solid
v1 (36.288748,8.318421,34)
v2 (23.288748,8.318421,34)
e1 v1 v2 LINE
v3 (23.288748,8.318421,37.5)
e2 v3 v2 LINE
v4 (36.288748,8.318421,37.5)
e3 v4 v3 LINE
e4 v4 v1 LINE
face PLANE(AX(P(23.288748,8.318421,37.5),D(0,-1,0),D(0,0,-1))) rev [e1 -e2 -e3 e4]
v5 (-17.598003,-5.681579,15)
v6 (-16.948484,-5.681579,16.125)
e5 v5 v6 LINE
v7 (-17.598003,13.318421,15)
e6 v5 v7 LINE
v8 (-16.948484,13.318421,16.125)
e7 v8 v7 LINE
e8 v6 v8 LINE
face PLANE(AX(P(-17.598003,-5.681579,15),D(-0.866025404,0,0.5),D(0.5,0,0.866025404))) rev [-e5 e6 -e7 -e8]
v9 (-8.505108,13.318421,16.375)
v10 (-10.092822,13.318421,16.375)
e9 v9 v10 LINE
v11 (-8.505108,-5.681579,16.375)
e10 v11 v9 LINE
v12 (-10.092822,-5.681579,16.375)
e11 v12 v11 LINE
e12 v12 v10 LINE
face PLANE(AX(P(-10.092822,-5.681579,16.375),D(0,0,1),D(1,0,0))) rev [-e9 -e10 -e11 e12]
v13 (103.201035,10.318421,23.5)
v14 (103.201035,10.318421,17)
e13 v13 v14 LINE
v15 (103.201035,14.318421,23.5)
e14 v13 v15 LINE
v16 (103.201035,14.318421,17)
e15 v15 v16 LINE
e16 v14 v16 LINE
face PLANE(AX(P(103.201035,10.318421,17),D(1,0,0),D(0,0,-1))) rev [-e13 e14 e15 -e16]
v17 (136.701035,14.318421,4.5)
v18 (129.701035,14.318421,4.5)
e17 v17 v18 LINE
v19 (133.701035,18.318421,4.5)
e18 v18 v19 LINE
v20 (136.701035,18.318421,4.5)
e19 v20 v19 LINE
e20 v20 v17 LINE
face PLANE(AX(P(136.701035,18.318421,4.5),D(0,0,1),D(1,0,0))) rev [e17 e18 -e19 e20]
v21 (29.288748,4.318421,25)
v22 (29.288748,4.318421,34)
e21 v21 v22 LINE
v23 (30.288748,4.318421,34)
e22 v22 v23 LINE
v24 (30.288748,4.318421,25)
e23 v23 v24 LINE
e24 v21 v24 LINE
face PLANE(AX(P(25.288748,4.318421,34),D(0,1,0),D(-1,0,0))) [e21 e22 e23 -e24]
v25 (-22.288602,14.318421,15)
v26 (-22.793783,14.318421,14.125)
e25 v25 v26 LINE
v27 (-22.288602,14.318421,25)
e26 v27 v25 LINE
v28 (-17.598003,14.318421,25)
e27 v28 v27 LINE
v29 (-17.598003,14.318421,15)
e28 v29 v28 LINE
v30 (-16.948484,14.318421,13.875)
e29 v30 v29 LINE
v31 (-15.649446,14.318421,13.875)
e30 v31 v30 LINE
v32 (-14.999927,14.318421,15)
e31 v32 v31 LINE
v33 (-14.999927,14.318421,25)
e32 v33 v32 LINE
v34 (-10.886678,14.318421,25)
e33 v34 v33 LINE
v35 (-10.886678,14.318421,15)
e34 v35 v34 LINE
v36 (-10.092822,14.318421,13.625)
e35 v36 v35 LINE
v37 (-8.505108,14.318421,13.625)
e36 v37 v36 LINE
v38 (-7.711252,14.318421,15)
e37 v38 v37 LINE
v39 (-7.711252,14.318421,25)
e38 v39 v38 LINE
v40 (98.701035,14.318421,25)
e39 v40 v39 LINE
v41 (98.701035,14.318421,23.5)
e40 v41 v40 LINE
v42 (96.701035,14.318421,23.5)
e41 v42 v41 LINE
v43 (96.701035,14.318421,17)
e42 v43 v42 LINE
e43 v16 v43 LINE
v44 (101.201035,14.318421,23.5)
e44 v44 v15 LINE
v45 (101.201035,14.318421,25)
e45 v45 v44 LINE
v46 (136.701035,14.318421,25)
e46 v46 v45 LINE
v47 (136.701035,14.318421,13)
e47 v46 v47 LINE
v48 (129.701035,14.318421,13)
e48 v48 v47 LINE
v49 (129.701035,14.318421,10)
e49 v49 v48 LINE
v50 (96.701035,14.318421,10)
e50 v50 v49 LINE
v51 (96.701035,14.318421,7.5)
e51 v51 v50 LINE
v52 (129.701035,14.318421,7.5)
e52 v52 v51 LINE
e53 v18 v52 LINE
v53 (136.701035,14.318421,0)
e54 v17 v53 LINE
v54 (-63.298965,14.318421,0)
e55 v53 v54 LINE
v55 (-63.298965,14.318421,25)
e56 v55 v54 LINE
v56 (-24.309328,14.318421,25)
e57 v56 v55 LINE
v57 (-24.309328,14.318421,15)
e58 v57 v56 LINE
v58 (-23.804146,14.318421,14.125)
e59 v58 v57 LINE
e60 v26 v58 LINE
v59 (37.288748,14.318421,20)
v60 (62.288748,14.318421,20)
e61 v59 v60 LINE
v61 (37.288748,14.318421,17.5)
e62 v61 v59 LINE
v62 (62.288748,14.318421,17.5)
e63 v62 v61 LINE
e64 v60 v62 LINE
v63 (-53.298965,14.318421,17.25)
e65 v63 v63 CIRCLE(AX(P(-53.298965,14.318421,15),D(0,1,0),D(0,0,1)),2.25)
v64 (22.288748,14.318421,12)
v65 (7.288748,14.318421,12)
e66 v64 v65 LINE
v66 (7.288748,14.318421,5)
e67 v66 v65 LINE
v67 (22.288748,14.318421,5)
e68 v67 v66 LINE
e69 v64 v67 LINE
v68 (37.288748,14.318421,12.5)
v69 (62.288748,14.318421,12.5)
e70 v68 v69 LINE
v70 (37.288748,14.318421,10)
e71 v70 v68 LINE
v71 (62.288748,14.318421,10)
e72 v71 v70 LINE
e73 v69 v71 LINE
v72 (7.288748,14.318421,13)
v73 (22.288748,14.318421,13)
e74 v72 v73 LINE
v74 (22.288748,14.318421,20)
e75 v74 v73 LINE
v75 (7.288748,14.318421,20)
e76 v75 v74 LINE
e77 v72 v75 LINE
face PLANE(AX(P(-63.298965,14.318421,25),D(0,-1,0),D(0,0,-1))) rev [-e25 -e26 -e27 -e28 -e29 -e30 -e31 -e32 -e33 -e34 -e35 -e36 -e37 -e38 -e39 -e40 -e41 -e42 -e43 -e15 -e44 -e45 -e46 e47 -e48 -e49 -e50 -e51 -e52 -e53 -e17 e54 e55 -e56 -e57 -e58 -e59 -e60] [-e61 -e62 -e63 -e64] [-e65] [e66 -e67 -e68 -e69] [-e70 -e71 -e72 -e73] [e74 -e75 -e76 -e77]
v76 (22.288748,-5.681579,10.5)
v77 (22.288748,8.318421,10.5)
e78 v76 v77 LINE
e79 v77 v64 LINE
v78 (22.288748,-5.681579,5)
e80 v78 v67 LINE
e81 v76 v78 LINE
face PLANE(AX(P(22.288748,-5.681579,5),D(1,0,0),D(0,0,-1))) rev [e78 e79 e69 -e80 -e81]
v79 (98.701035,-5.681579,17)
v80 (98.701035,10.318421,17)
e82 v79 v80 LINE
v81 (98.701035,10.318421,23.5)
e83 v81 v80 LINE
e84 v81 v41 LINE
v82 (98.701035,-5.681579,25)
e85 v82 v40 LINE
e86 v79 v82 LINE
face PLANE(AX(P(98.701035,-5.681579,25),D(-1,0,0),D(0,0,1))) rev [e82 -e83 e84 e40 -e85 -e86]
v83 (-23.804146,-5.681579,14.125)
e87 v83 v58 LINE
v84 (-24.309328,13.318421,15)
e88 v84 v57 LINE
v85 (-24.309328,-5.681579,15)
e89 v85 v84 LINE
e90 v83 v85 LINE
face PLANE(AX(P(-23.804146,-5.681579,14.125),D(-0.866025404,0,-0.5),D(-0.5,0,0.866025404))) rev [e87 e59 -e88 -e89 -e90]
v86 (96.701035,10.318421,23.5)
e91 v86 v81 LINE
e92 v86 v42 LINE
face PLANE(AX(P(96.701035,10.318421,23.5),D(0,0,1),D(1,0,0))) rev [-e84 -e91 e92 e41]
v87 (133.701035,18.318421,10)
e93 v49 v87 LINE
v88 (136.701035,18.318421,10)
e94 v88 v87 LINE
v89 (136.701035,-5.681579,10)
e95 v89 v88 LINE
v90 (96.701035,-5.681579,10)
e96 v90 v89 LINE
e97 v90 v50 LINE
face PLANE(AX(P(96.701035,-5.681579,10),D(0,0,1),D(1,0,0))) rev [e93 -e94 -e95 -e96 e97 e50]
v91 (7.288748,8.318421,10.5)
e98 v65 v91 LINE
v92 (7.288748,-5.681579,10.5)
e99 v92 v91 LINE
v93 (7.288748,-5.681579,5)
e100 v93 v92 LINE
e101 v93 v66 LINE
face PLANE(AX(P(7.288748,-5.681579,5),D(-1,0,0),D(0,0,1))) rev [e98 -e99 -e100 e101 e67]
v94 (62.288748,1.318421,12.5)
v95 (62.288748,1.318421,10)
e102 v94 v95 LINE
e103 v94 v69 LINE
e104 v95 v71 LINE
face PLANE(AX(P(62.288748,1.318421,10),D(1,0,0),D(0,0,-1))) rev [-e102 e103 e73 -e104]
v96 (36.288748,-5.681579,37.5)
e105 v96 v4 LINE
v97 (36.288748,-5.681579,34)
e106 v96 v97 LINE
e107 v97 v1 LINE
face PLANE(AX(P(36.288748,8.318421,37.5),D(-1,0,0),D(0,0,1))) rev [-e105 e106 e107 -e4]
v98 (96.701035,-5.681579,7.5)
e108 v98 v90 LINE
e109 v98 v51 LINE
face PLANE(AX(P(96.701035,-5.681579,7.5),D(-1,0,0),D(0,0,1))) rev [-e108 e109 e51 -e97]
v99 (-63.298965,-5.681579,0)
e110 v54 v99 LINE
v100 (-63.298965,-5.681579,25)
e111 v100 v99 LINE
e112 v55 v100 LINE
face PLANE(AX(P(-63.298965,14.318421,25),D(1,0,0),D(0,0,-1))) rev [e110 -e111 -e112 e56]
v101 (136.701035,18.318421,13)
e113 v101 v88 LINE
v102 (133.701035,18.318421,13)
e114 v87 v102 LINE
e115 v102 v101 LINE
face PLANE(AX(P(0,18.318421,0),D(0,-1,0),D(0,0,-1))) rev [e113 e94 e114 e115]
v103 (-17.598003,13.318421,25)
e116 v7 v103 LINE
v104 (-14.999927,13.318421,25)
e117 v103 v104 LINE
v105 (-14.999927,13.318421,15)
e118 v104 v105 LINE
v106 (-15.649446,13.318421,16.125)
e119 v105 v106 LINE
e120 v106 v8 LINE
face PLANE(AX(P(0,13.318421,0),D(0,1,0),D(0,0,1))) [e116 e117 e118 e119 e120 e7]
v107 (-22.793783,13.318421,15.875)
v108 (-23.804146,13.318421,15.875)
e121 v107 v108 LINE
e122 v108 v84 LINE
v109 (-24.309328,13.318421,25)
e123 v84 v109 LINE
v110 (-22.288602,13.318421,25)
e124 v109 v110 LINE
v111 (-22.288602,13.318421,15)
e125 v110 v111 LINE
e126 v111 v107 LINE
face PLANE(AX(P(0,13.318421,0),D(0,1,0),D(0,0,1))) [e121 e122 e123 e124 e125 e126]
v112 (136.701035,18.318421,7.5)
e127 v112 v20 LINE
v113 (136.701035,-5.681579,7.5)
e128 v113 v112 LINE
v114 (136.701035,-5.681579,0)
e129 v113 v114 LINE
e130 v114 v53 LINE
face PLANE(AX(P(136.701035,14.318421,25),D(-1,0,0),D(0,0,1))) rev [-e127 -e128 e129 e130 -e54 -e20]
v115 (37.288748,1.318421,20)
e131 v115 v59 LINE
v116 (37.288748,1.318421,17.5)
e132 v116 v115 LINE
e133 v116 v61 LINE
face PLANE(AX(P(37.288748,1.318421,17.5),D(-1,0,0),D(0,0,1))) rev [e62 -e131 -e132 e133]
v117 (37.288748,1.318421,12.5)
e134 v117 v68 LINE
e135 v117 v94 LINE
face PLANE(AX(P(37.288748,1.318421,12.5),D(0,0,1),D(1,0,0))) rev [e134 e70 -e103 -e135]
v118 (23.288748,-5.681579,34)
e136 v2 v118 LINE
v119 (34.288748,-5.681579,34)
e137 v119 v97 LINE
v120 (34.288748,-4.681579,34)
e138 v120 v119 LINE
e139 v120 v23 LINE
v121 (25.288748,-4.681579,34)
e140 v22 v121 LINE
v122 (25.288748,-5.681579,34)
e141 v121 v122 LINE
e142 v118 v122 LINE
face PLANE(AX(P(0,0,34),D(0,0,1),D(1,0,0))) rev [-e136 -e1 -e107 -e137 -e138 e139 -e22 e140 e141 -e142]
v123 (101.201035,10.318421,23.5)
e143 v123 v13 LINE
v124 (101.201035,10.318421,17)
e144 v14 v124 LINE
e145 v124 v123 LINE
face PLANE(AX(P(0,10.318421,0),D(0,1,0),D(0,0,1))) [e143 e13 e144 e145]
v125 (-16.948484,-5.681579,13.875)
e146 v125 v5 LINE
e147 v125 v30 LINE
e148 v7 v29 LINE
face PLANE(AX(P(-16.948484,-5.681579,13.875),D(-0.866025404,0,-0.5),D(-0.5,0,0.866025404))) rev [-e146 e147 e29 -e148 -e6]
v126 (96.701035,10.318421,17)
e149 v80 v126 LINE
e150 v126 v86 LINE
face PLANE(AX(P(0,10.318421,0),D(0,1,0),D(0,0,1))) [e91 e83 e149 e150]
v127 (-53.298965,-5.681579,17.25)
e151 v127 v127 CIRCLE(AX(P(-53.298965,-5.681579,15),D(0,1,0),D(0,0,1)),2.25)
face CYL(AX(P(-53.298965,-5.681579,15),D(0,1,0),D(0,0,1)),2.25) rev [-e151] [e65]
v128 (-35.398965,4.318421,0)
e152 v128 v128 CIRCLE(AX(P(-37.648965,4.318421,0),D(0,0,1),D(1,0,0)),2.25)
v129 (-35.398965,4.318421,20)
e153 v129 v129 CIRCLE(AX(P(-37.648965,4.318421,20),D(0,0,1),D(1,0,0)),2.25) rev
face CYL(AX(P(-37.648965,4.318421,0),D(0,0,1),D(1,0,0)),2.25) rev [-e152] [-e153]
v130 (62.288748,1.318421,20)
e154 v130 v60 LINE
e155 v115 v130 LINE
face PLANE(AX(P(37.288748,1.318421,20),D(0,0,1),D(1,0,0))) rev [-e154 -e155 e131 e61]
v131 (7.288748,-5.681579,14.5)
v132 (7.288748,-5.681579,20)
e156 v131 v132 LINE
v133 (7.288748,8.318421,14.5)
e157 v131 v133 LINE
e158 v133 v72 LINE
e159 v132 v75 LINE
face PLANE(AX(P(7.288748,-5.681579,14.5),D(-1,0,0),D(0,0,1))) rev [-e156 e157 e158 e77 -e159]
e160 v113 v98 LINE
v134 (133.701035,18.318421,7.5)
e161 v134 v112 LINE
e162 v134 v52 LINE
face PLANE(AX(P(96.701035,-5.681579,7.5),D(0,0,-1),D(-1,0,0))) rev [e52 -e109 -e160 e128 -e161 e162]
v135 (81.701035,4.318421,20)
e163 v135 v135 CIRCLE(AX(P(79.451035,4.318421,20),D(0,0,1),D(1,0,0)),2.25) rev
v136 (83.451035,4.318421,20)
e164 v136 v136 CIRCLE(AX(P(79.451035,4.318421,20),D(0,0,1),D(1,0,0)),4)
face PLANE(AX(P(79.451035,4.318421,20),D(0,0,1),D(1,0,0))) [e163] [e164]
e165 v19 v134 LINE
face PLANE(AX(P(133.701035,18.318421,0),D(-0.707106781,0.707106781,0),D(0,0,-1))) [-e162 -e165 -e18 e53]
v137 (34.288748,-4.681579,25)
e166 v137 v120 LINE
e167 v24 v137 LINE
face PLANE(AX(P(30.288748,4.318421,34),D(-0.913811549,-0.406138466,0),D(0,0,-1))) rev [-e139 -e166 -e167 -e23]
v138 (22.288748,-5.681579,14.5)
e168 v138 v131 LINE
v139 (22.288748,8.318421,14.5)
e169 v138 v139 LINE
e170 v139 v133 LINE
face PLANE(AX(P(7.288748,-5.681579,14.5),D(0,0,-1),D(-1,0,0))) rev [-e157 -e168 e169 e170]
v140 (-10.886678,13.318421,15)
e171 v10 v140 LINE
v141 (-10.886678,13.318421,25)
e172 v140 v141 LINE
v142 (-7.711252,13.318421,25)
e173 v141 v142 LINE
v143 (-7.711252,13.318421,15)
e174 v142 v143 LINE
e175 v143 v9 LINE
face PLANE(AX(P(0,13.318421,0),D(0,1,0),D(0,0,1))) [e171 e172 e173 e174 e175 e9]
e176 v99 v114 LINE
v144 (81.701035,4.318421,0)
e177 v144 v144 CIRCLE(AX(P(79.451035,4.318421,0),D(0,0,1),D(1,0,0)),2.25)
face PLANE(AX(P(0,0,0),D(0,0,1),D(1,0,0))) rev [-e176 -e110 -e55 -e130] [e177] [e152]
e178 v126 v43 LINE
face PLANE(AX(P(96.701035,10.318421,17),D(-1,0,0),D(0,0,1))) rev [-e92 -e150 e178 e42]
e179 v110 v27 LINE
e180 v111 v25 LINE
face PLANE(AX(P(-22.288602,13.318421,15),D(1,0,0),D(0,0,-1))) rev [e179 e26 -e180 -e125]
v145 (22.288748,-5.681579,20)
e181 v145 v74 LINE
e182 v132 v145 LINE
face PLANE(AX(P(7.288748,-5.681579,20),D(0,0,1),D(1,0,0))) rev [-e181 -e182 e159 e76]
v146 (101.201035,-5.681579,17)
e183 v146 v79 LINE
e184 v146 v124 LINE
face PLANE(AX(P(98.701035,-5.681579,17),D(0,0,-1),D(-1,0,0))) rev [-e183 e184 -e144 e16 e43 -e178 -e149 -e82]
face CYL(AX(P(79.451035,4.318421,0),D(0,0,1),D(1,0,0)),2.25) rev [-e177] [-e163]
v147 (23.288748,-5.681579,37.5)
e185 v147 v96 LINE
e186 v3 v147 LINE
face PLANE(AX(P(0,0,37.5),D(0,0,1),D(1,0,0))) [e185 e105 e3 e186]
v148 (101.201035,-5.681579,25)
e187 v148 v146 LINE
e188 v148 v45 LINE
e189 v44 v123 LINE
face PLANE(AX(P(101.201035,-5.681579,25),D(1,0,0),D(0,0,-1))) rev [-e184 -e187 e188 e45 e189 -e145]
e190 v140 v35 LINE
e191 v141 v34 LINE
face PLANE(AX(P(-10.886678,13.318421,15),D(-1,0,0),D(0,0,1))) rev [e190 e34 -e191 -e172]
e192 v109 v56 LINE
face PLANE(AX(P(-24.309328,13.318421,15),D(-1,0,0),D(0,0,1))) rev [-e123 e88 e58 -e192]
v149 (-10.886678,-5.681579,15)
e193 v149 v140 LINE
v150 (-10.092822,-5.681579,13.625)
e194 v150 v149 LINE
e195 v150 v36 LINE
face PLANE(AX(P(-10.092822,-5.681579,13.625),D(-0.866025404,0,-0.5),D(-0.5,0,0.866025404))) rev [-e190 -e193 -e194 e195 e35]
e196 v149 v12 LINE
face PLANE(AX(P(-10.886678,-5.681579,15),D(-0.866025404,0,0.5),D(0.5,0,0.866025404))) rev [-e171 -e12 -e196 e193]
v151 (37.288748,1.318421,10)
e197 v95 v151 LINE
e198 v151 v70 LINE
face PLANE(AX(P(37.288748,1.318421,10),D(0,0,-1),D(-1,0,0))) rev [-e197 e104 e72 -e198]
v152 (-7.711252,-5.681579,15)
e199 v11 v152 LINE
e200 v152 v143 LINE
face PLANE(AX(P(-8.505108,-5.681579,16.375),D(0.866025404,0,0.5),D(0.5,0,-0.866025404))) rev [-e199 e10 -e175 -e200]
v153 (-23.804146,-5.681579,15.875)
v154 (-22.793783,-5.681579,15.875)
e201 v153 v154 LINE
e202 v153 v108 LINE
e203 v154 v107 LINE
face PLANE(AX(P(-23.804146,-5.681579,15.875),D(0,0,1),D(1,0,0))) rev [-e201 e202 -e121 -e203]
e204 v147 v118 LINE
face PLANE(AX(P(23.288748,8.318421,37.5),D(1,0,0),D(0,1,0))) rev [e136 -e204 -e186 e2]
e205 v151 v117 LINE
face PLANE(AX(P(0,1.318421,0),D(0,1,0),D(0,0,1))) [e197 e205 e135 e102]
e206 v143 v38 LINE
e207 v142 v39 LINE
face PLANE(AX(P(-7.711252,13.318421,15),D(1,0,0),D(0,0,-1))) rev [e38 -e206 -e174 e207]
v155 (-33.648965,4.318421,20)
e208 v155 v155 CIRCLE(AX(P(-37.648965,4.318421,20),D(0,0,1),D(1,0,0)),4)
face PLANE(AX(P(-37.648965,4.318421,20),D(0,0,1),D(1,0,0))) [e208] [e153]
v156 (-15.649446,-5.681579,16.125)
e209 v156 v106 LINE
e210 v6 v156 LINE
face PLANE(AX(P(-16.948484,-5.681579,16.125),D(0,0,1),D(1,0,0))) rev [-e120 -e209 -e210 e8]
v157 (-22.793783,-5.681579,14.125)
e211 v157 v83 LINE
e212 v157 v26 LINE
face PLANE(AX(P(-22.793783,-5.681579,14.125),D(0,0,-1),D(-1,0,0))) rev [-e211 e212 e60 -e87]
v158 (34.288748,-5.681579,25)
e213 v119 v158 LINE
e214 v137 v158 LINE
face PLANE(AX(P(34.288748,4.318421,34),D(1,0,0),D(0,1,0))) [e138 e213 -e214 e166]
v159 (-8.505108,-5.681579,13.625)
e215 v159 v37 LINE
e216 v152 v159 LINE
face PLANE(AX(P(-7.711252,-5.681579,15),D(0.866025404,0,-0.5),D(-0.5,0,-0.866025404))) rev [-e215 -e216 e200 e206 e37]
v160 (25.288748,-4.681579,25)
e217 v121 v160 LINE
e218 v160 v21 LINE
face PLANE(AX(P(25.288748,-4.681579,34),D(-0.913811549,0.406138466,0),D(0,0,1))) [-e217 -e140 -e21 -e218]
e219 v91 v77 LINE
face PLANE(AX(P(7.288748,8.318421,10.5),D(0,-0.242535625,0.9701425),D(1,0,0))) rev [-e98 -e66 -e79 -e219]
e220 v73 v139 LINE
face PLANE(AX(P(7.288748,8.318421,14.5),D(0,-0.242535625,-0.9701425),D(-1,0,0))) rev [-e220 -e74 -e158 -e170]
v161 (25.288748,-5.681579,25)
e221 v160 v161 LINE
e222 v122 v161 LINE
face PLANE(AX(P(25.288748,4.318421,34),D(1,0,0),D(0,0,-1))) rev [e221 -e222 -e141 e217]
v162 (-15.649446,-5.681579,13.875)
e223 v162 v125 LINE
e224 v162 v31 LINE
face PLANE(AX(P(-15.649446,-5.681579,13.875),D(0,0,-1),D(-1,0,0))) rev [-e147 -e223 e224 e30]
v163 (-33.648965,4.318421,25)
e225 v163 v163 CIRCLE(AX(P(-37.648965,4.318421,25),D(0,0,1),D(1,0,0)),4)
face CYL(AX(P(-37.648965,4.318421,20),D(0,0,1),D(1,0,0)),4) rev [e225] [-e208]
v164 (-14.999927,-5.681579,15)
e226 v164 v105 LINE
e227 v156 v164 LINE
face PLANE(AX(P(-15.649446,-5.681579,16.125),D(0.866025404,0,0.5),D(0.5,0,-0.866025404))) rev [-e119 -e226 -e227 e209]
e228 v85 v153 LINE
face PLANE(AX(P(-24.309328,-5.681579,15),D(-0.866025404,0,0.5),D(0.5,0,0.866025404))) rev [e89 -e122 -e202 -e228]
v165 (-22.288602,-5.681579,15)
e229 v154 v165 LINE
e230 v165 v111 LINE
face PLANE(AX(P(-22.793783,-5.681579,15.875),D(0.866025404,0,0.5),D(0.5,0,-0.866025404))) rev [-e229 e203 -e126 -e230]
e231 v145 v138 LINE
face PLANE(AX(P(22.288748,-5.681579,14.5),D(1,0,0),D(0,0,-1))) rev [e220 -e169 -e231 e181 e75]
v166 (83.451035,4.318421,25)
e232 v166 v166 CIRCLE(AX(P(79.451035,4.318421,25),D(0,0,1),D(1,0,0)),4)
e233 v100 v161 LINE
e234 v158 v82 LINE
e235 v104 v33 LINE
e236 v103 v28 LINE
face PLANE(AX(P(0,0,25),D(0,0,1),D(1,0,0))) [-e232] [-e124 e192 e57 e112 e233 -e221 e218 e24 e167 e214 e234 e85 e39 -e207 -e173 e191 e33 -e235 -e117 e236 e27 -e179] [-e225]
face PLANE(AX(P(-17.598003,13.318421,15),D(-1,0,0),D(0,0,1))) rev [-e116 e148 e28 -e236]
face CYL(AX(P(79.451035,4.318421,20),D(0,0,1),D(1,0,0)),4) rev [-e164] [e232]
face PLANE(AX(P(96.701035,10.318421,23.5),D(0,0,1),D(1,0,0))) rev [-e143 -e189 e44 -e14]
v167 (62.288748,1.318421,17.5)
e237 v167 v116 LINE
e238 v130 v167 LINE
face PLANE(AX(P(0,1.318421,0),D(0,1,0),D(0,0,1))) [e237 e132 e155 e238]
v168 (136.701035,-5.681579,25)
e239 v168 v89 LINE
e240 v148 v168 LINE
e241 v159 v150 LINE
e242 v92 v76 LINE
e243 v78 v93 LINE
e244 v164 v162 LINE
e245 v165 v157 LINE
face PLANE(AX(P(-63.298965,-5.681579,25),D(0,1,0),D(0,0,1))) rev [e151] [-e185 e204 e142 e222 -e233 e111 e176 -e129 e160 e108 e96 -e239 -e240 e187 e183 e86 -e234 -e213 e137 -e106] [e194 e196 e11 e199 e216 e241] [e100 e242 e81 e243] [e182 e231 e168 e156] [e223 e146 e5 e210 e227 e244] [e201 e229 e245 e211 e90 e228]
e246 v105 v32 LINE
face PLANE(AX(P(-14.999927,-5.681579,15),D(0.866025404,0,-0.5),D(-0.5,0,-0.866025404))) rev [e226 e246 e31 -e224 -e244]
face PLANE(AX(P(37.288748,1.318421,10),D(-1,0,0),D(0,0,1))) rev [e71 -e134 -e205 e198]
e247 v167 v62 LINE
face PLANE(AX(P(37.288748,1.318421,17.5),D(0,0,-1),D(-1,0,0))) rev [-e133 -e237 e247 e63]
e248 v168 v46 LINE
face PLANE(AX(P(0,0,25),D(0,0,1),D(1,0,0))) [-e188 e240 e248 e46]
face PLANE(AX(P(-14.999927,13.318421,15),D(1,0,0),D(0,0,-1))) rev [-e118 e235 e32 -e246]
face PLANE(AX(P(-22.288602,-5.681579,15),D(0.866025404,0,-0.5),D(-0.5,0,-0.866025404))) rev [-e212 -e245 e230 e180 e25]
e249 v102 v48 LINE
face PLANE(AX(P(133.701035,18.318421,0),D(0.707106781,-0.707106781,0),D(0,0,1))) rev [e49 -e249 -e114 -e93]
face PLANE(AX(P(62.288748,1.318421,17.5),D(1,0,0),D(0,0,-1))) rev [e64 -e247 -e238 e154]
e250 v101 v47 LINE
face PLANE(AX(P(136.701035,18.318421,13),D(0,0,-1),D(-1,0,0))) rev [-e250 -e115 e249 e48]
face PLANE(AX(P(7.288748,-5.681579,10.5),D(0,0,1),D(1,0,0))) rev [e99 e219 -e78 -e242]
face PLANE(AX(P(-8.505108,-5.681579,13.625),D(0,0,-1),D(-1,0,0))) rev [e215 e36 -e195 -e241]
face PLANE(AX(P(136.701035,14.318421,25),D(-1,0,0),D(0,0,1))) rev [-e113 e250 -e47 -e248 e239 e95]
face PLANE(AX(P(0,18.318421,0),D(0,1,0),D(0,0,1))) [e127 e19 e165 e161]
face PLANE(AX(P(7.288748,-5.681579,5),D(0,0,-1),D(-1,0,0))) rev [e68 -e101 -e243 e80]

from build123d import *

# Parameters (mm, degrees)
SCHIZZO1_W                    = 200
SCHIZZO1_H                    = 20
ESTRUSIONE_ESTRUSIONE1_DEPTH  = 25
SCHIZZO2_R                    = 2.25
TAGLIO_ESTRUSIONE1_DEPTH      = 141.400046302
SCHIZZO4_W                    = 2.020725942
SCHIZZO4_H                    = 10
SCHIZZO4_W_2                  = 2.598076211
SCHIZZO4_W_3                  = 3.175426481
TAGLIO_ESTRUSIONE2_DEPTH      = 1
SCHIZZO7_W                    = 15
SCHIZZO7_H                    = 5.5
TAGLIO_ESTRUSIONE3_DEPTH      = 141.400046302
SMUSSO1_SIZE                  = 1.5
SMUSSO1_SIZE2                 = 6
SCHIZZO8_W                    = 25
SCHIZZO8_H                    = 2.5
TAGLIO_ESTRUSIONE4_DEPTH      = 13
SCHIZZO9_W                    = 40
SCHIZZO9_H                    = 2.5
TAGLIO_ESTRUSIONE5_DEPTH      = 141.400046302
SCHIZZO10_W                   = 7
SCHIZZO10_H                   = 3
ESTRUSIONE_ESTRUSIONE5_DEPTH  = 4
SMUSSO2_SIZE                  = 4
SCHIZZO11_W                   = 2.5
SCHIZZO11_H                   = 8
TAGLIO_ESTRUSIONE6_DEPTH      = 141.400046302
SCHIZZO12_W                   = 6.5
SCHIZZO12_H                   = 6.5
TAGLIO_ESTRUSIONE7_DEPTH      = 4
SCHIZZO13_W                   = 9
SCHIZZO13_H                   = 10
ESTRUSIONE_ESTRUSIONE9_DEPTH  = 9
SCHIZZO14_W                   = 13
SCHIZZO14_H                   = 14
ESTRUSIONE_ESTRUSIONE10_DEPTH = 3.5
SMUSSO3_SIZE                  = 9
SMUSSO3_SIZE2                 = 4
SMUSSO4_SIZE                  = 4
SMUSSO4_SIZE2                 = 9
SCHIZZO16_R                   = 2.25
TAGLIO_ESTRUSIONE8_DEPTH      = 141.17038757
SCHIZZO17_R                   = 4
TAGLIO_ESTRUSIONE9_DEPTH      = 5


with BuildPart() as part:
    # Schizzo1 → Estrusione-Estrusione1 (new body)
    with BuildSketch(Plane.XY):
        with Locations((36.701035116, 4.318421053)):
            Rectangle(SCHIZZO1_W, SCHIZZO1_H)
    extrude(amount=ESTRUSIONE_ESTRUSIONE1_DEPTH)

    # Schizzo2 → Taglio-Estrusione1 (cut, through all)
    with BuildSketch(Plane(origin=(0, 14.318421053, 0), x_dir=(1, 0, 0), z_dir=(0, 1, 0))):
        with Locations(Location((-53.298964884, -15, 0), (0, 0, 270))):
            Circle(SCHIZZO2_R)
        Polygon((-23.80414637, -15.875), (-22.793783399, -15.875), (-22.288601913, -15), (-22.793783399, -14.125), (-23.80414637, -14.125), (-24.309327855, -15), align=None)
        Polygon((-14.999926779, -15), (-15.649445831, -13.875), (-16.948483937, -13.875), (-17.59800299, -15), (-16.948483937, -16.125), (-15.649445831, -16.125), align=None)
        Polygon((-8.505108264, -16.375), (-7.711251644, -15), (-8.505108264, -13.625), (-10.092821504, -13.625), (-10.886678125, -15), (-10.092821504, -16.375), align=None)
    extrude(amount=-TAGLIO_ESTRUSIONE1_DEPTH, mode=Mode.SUBTRACT)

    # Schizzo4 → Taglio-Estrusione2 (cut)
    with BuildSketch(Plane(origin=(0, 14.318421053, 0), x_dir=(1, 0, 0), z_dir=(0, 1, 0))):
        with Locations((-23.298964884, -20)):
            Rectangle(SCHIZZO4_W, SCHIZZO4_H)
        with Locations((-16.298964885, -20)):
            Rectangle(SCHIZZO4_W_2, SCHIZZO4_H)
        with Locations((-9.298964885, -20)):
            Rectangle(SCHIZZO4_W_3, SCHIZZO4_H)
    extrude(amount=-TAGLIO_ESTRUSIONE2_DEPTH, mode=Mode.SUBTRACT)

    # Schizzo7 → Taglio-Estrusione3 (cut, through all)
    with BuildSketch(Plane(origin=(0, 14.318421053, 0), x_dir=(1, 0, 0), z_dir=(0, 1, 0))):
        with Locations((14.788748356, -17.25)):
            Rectangle(SCHIZZO7_W, SCHIZZO7_H)
        with Locations((14.788748356, -7.75)):
            Rectangle(SCHIZZO7_W, SCHIZZO7_H)
    extrude(amount=-TAGLIO_ESTRUSIONE3_DEPTH, mode=Mode.SUBTRACT)

    # Smusso1
    smusso1_edges = [part.edges().sort_by_distance(p)[0] for p in [
        (14.788748356, 14.318421053, 14.5),
        (14.788748356, 14.318421053, 10.5),
    ]]
    smusso1_side = [part.faces().sort_by_distance(p)[0] for p in [
        (38.695689024, 14.318421053, 12.36530447),
    ]]
    chamfer(smusso1_edges, length=SMUSSO1_SIZE, length2=SMUSSO1_SIZE2, reference=smusso1_side[0])

    # Schizzo8 → Taglio-Estrusione4 (cut)
    with BuildSketch(Plane(origin=(0, 14.318421053, 0), x_dir=(1, 0, 0), z_dir=(0, 1, 0))):
        with Locations((49.788748356, -18.75)):
            Rectangle(SCHIZZO8_W, SCHIZZO8_H)
        with Locations((49.788748356, -11.25)):
            Rectangle(SCHIZZO8_W, SCHIZZO8_H)
    extrude(amount=-TAGLIO_ESTRUSIONE4_DEPTH, mode=Mode.SUBTRACT)

    # Schizzo9 → Taglio-Estrusione5 (cut, through all)
    with BuildSketch(Plane(origin=(0, 14.318421053, 0), x_dir=(1, 0, 0), z_dir=(0, 1, 0))):
        with Locations((116.701035116, -8.75)):
            Rectangle(SCHIZZO9_W, SCHIZZO9_H)
    extrude(amount=-TAGLIO_ESTRUSIONE5_DEPTH, mode=Mode.SUBTRACT)

    # Schizzo10 → Estrusione-Estrusione5 (add)
    with BuildSketch(Plane(origin=(0, 14.318421053, 0), x_dir=(1, 0, 0), z_dir=(0, 1, 0))):
        with Locations((133.201035116, -6)):
            Rectangle(SCHIZZO10_W, SCHIZZO10_H)
        with Locations((133.201035116, -11.5)):
            Rectangle(SCHIZZO10_W, SCHIZZO10_H)
    extrude(amount=ESTRUSIONE_ESTRUSIONE5_DEPTH)

    # Smusso2
    smusso2_edges = [part.edges().sort_by_distance(p)[0] for p in [
        (129.701035116, 18.318421053, 11.5),
        (129.701035116, 18.318421053, 6),
    ]]
    chamfer(smusso2_edges, length=SMUSSO2_SIZE - 0.0001)  # a hair under: the kernel refuses the full size

    # Schizzo11 → Taglio-Estrusione6 (cut, through all)
    with BuildSketch(Plane(origin=(0, 14.318421053, 0), x_dir=(1, 0, 0), z_dir=(0, 1, 0))):
        with Locations((99.951035116, -21)):
            Rectangle(SCHIZZO11_W, SCHIZZO11_H)
    extrude(amount=-TAGLIO_ESTRUSIONE6_DEPTH, mode=Mode.SUBTRACT)

    # Schizzo12 → Taglio-Estrusione7 (cut)
    with BuildSketch(Plane(origin=(0, 14.318421053, 0), x_dir=(1, 0, 0), z_dir=(0, 1, 0))):
        with Locations((99.951035116, -20.25)):
            Rectangle(SCHIZZO12_W, SCHIZZO12_H)
    extrude(amount=-TAGLIO_ESTRUSIONE7_DEPTH, mode=Mode.SUBTRACT)

    # Schizzo13 → Estrusione-Estrusione9 (add)
    with BuildSketch(Plane.XY.offset(25)):
        with Locations((29.788748356, -0.681578947)):
            Rectangle(SCHIZZO13_W, SCHIZZO13_H)
    extrude(amount=ESTRUSIONE_ESTRUSIONE9_DEPTH)

    # Schizzo14 → Estrusione-Estrusione10 (add)
    with BuildSketch(Plane.XY.offset(34)):
        with Locations((29.788748356, 1.318421053)):
            Rectangle(SCHIZZO14_W, SCHIZZO14_H)
    extrude(amount=ESTRUSIONE_ESTRUSIONE10_DEPTH)

    # Smusso3
    smusso3_edges = [part.edges().sort_by_distance(p)[0] for p in [
        (34.288748356, 4.318421053, 29.5),
    ]]
    smusso3_side = [part.faces().sort_by_distance(p)[0] for p in [
        (34.288748356, -0.681578947, 29.5),
    ]]
    chamfer(smusso3_edges, length=SMUSSO3_SIZE, length2=SMUSSO3_SIZE2, reference=smusso3_side[0])

    # Smusso4
    smusso4_edges = [part.edges().sort_by_distance(p)[0] for p in [
        (25.288748356, 4.318421053, 29.5),
    ]]
    smusso4_side = [part.faces().sort_by_distance(p)[0] for p in [
        (27.788748356, 4.318421053, 29.5),
    ]]
    chamfer(smusso4_edges, length=SMUSSO4_SIZE, length2=SMUSSO4_SIZE2, reference=smusso4_side[0])

    # Schizzo16 → Taglio-Estrusione8 (cut, through all)
    with BuildSketch(Plane.XY.offset(25)):
        with Locations((-37.648964884, 4.318421053)):
            Circle(SCHIZZO16_R)
        with Locations((79.451035116, 4.318421053)):
            Circle(SCHIZZO16_R)
    extrude(amount=-TAGLIO_ESTRUSIONE8_DEPTH, mode=Mode.SUBTRACT)

    # Schizzo17 → Taglio-Estrusione9 (cut)
    with BuildSketch(Plane.XY.offset(25)):
        with Locations((-37.648964884, 4.318421053)):
            Circle(SCHIZZO17_R)
        with Locations((79.451035116, 4.318421053)):
            Circle(SCHIZZO17_R)
    extrude(amount=-TAGLIO_ESTRUSIONE9_DEPTH, mode=Mode.SUBTRACT)


solid = part.part
